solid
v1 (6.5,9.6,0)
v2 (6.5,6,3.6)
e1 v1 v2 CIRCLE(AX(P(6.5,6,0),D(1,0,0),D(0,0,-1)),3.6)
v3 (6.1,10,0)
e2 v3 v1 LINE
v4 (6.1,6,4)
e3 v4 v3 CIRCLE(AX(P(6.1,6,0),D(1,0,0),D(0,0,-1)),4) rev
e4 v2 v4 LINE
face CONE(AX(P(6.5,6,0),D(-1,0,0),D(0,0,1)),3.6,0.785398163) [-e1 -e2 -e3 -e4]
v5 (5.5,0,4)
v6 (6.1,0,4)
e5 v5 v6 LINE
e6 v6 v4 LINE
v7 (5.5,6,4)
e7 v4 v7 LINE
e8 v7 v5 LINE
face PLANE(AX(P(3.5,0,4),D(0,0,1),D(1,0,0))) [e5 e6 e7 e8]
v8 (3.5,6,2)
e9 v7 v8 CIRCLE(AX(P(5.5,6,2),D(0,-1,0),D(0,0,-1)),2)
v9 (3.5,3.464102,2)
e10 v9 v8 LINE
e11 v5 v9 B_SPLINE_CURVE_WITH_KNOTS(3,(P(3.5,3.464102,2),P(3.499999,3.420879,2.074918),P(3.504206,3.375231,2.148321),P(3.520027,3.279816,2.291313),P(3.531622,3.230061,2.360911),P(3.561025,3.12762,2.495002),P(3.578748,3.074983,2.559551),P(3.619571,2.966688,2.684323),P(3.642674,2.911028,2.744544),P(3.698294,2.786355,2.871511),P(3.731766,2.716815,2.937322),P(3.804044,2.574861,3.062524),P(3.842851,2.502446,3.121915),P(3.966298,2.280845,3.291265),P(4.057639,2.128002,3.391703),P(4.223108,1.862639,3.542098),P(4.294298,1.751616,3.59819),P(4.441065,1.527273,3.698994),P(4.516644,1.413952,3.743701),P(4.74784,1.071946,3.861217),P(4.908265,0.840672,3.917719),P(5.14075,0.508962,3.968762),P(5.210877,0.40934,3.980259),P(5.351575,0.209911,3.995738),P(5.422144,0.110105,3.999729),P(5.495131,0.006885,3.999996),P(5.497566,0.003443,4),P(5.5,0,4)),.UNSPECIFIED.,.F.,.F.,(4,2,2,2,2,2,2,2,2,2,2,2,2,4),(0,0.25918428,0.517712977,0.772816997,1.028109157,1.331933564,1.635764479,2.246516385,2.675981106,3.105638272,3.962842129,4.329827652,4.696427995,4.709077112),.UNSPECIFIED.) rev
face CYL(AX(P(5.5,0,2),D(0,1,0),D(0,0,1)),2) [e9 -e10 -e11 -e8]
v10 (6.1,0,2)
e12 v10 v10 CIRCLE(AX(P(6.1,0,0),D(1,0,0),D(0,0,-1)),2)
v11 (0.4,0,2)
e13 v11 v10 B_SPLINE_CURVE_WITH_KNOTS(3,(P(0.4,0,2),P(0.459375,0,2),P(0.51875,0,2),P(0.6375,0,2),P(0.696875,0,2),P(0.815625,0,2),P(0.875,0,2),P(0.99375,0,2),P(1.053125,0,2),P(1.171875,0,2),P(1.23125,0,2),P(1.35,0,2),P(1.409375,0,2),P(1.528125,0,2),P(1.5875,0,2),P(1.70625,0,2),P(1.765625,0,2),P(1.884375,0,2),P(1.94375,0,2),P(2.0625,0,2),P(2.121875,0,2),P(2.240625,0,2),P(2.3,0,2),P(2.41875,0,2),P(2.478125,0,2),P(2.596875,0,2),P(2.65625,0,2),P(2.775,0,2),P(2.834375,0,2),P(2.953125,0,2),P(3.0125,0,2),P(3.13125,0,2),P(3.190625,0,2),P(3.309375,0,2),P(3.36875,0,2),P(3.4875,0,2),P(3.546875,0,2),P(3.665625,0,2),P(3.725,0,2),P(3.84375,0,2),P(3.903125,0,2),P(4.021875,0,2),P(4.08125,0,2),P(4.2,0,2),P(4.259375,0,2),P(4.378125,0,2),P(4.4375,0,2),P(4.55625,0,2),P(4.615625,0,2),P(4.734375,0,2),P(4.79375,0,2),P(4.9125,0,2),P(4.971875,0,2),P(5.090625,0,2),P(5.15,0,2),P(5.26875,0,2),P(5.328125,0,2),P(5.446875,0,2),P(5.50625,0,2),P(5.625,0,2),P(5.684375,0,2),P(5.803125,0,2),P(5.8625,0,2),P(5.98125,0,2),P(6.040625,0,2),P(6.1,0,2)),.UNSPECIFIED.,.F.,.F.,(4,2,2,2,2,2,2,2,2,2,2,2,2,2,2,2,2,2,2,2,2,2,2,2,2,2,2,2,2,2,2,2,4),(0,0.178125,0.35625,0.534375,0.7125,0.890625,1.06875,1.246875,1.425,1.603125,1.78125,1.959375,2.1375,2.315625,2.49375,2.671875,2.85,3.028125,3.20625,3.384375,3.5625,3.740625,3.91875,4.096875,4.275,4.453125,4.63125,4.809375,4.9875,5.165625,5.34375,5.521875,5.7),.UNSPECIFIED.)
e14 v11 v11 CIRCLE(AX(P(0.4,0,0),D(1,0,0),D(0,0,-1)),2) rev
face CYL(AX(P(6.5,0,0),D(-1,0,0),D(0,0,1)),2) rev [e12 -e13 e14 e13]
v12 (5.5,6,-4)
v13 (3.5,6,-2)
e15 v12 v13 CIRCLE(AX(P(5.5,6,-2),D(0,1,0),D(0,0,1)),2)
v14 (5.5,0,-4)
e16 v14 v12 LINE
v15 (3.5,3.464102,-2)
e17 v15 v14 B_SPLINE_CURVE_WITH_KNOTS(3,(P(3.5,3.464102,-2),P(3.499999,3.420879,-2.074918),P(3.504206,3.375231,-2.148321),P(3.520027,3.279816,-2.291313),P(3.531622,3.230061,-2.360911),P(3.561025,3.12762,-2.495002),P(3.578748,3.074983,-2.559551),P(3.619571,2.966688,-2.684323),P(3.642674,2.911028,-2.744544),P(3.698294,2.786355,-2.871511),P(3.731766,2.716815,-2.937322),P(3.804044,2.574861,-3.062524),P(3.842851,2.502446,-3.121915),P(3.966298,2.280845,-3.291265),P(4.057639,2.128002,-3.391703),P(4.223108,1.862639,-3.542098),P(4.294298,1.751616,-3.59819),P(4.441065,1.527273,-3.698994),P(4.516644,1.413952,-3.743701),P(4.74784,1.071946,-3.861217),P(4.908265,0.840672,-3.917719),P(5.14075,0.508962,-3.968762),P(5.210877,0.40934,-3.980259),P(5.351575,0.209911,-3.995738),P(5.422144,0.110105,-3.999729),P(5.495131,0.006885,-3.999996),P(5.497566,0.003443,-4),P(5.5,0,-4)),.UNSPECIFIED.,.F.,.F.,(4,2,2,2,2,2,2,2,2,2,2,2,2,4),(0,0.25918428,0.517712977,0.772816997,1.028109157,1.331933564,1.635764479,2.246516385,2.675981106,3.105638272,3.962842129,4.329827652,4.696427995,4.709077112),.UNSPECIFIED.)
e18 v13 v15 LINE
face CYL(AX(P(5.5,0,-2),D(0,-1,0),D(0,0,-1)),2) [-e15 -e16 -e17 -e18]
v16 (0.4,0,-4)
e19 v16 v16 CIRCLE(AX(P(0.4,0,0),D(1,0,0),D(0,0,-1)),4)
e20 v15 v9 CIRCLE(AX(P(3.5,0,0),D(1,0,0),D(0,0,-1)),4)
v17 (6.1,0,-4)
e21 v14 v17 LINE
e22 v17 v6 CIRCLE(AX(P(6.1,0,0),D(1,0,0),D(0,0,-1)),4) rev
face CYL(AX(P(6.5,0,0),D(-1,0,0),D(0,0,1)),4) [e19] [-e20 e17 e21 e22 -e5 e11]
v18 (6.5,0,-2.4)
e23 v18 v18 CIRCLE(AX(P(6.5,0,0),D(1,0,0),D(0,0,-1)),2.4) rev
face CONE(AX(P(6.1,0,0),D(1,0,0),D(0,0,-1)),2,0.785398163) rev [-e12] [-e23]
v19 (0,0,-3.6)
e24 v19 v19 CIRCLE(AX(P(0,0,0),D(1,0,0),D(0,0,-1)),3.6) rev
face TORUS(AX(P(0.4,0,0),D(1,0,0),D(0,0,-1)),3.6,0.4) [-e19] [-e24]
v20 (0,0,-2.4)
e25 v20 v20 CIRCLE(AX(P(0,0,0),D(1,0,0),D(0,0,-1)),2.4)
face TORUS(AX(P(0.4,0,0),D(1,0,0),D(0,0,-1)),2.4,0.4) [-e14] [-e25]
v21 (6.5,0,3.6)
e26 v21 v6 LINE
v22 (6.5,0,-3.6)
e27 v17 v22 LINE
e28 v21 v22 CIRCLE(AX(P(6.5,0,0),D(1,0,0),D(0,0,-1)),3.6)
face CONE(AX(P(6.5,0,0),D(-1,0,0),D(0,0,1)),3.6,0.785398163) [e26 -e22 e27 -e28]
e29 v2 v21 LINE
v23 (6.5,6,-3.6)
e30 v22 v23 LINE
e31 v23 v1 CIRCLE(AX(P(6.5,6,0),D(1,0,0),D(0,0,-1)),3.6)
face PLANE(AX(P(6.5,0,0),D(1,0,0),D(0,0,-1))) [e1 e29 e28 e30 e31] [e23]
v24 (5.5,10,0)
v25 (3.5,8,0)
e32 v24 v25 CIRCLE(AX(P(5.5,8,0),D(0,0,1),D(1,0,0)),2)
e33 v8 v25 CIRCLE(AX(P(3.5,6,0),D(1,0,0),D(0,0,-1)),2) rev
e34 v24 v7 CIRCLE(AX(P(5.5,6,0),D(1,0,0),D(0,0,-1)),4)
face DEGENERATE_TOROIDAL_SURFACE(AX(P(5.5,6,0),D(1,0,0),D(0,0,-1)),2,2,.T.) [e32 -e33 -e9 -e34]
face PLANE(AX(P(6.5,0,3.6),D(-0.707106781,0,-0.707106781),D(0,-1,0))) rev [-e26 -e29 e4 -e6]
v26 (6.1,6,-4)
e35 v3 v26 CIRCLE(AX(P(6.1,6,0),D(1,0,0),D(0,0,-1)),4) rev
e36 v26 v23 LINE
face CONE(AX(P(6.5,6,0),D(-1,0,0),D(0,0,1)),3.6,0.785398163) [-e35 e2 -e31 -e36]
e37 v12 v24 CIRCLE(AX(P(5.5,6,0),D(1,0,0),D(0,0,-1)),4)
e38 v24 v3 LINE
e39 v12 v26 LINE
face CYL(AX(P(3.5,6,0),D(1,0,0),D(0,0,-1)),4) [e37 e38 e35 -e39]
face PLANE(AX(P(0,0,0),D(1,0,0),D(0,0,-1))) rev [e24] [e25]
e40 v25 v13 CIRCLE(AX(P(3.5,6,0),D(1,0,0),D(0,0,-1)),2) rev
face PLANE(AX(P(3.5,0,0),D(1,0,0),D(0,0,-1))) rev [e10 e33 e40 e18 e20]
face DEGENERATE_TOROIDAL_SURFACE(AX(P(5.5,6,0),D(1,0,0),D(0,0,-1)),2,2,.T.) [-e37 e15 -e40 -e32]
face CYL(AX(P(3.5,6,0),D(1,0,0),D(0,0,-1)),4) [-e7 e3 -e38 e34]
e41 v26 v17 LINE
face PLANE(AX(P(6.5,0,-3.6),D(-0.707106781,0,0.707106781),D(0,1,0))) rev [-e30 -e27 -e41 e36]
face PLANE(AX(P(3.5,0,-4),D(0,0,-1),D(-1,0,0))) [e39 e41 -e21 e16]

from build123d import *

# Parameters (mm, degrees)
SKETCH_1_R      = 4
SKETCH_1_R_2    = 2
EXTRUDE_1_DEPTH = 6.5
EXTRUDE_START   = -3
EXTRUDE_2_DEPTH = 3
FILLET_1_R      = 4
CHAMFER_1_SIZE  = 0.4
FILLET_2_R      = 2
FILLET_3_R      = 0.4


# Some blends are built 0.0001 mm under size
with BuildPart() as part:
    # 草图1 → 凸台-拉伸1 (new body)
    with BuildSketch(Plane(origin=(0, 0, 0), x_dir=(0, 0, -1), z_dir=(1, 0, 0))):
        with Locations(Location((0, 0, 0), (0, 0, 180))):
            Circle(SKETCH_1_R)
        with Locations(Location((0, 0, 0), (0, 0, 180))):
            Circle(SKETCH_1_R_2, mode=Mode.SUBTRACT)
    extrude(amount=EXTRUDE_1_DEPTH)

    # 草图2 → 凸台-拉伸2 (add)
    with BuildSketch(Plane(origin=(6.5, 0, 0), x_dir=(0, 0, -1), z_dir=(1, 0, 0)).offset(EXTRUDE_START)):
        with BuildLine():
            Line((2, 0), (4, 0))
            Line((4, 0), (4, 10))
            Line((4, 10), (-4, 10))
            Line((-4, 10), (-4, 0))
            Line((-4, 0), (-2, 0))
            ThreePointArc((-2, 0), (0, 2), (2, 0))
        make_face()
    extrude(amount=EXTRUDE_2_DEPTH)

    # 圆角1
    fillet_1_edges = [part.edges().sort_by_distance(p)[0] for p in [
        (5, 10, -4),
        (5, 10, 4),
    ]]
    fillet(fillet_1_edges, radius=FILLET_1_R - 0.0001)  # a hair under: the kernel refuses the full size

    # 倒角1
    chamfer_1_edges = [part.edges().sort_by_distance(p)[0] for p in [
        (6.5, -4, 0),
        (6.5, 3.00005, -4),
        (6.5, 3.00005, 4),
        (6.5, 8.828456414, 2.828456414),
        (6.5, 8.828456414, -2.828456414),
        (6.5, 0, -2),
    ]]
    chamfer(chamfer_1_edges, length=CHAMFER_1_SIZE)

    # 圆角2
    # the kernel refuses this fillet: 2 mm, written as the material it takes off along each edge
    with BuildSketch(Plane(origin=(3.5, -5, -4), x_dir=(0, 0, 1), z_dir=(0, 1, 0))) as fillet_2_piece_1_section:
        with BuildLine():
            CenterArc((FILLET_2_R, FILLET_2_R), FILLET_2_R, 180, 90)
            Line((0, FILLET_2_R), (0, 0))
            Line((0, 0), (FILLET_2_R, 0))
        make_face()
    fillet_2_piece_1 = extrude(amount=11.0001, mode=Mode.PRIVATE)
    fillet_2_piece_1 = fillet_2_piece_1 - Plane(origin=(4.073639318, 0, 0), x_dir=(0, 0, 1), z_dir=(-1, 0, 0)) * Cylinder(4, 31, mode=Mode.PRIVATE)
    add(fillet_2_piece_1, mode=Mode.SUBTRACT)
    with BuildSketch(Plane(origin=(3.5, 6.0001, 4), x_dir=(1, 0, 0), z_dir=(0, -1, 0))) as fillet_2_piece_2_section:
        with BuildLine():
            CenterArc((FILLET_2_R, -FILLET_2_R), FILLET_2_R, 90, 90)
            Line((0, -FILLET_2_R), (0, 0))
            Line((0, 0), (FILLET_2_R, 0))
        make_face()
    fillet_2_piece_2 = extrude(amount=11.0001, mode=Mode.PRIVATE)
    fillet_2_piece_2 = fillet_2_piece_2 - Plane(origin=(4.073638991, 0, 0), x_dir=(0, 0, 1), z_dir=(-1, 0, 0)) * Cylinder(4, 31, mode=Mode.PRIVATE)
    add(fillet_2_piece_2, mode=Mode.SUBTRACT)
    with BuildSketch(Plane(origin=(3.5, 6.0001, 0.0001), x_dir=(0, 0, 1), z_dir=(0, -1, 0))) as fillet_2_piece_3:
        with BuildLine():
            CenterArc((3.9999 - FILLET_2_R, -FILLET_2_R), FILLET_2_R, 0, 90)
            Line((3.9999 - FILLET_2_R, 0), (3.9999, 0))
            Line((3.9999, 0), (3.9999, -FILLET_2_R))
        make_face()
    revolve(axis=Axis((3.5, 6.0001, 0.0001), (-1, 0, 0)), revolution_arc=90, mode=Mode.SUBTRACT)
    with BuildSketch(Plane(origin=(3.5, 6.0001, -0.0001), x_dir=(0, 1, 0), z_dir=(0, 0, 1))) as fillet_2_piece_4:
        with BuildLine():
            CenterArc((3.9999 - FILLET_2_R, -FILLET_2_R), FILLET_2_R, 0, 90)
            Line((3.9999, -FILLET_2_R), (3.9999, 0))
            Line((3.9999, 0), (3.9999 - FILLET_2_R, 0))
        make_face()
    revolve(axis=Axis((3.5, 6.0001, -0.0001), (-1, 0, 0)), revolution_arc=90, mode=Mode.SUBTRACT)
    with BuildSketch(Plane(origin=(3.5, 10, -0.0001), x_dir=(0, -1, 0), z_dir=(0, 0, 1))) as fillet_2_piece_5:
        with BuildLine():
            CenterArc((FILLET_2_R, FILLET_2_R), FILLET_2_R, 180, 90)
            Line((0, FILLET_2_R), (0, 0))
            Line((0, 0), (FILLET_2_R, 0))
        make_face()
    extrude(amount=0.0002, mode=Mode.SUBTRACT)

    # 圆角3
    fillet_3_edges = [part.edges().sort_by_distance(p)[0] for p in [
        (0, 0, -4),
        (0, 0, -2),
    ]]
    fillet(fillet_3_edges, radius=FILLET_3_R)


solid = part.part
